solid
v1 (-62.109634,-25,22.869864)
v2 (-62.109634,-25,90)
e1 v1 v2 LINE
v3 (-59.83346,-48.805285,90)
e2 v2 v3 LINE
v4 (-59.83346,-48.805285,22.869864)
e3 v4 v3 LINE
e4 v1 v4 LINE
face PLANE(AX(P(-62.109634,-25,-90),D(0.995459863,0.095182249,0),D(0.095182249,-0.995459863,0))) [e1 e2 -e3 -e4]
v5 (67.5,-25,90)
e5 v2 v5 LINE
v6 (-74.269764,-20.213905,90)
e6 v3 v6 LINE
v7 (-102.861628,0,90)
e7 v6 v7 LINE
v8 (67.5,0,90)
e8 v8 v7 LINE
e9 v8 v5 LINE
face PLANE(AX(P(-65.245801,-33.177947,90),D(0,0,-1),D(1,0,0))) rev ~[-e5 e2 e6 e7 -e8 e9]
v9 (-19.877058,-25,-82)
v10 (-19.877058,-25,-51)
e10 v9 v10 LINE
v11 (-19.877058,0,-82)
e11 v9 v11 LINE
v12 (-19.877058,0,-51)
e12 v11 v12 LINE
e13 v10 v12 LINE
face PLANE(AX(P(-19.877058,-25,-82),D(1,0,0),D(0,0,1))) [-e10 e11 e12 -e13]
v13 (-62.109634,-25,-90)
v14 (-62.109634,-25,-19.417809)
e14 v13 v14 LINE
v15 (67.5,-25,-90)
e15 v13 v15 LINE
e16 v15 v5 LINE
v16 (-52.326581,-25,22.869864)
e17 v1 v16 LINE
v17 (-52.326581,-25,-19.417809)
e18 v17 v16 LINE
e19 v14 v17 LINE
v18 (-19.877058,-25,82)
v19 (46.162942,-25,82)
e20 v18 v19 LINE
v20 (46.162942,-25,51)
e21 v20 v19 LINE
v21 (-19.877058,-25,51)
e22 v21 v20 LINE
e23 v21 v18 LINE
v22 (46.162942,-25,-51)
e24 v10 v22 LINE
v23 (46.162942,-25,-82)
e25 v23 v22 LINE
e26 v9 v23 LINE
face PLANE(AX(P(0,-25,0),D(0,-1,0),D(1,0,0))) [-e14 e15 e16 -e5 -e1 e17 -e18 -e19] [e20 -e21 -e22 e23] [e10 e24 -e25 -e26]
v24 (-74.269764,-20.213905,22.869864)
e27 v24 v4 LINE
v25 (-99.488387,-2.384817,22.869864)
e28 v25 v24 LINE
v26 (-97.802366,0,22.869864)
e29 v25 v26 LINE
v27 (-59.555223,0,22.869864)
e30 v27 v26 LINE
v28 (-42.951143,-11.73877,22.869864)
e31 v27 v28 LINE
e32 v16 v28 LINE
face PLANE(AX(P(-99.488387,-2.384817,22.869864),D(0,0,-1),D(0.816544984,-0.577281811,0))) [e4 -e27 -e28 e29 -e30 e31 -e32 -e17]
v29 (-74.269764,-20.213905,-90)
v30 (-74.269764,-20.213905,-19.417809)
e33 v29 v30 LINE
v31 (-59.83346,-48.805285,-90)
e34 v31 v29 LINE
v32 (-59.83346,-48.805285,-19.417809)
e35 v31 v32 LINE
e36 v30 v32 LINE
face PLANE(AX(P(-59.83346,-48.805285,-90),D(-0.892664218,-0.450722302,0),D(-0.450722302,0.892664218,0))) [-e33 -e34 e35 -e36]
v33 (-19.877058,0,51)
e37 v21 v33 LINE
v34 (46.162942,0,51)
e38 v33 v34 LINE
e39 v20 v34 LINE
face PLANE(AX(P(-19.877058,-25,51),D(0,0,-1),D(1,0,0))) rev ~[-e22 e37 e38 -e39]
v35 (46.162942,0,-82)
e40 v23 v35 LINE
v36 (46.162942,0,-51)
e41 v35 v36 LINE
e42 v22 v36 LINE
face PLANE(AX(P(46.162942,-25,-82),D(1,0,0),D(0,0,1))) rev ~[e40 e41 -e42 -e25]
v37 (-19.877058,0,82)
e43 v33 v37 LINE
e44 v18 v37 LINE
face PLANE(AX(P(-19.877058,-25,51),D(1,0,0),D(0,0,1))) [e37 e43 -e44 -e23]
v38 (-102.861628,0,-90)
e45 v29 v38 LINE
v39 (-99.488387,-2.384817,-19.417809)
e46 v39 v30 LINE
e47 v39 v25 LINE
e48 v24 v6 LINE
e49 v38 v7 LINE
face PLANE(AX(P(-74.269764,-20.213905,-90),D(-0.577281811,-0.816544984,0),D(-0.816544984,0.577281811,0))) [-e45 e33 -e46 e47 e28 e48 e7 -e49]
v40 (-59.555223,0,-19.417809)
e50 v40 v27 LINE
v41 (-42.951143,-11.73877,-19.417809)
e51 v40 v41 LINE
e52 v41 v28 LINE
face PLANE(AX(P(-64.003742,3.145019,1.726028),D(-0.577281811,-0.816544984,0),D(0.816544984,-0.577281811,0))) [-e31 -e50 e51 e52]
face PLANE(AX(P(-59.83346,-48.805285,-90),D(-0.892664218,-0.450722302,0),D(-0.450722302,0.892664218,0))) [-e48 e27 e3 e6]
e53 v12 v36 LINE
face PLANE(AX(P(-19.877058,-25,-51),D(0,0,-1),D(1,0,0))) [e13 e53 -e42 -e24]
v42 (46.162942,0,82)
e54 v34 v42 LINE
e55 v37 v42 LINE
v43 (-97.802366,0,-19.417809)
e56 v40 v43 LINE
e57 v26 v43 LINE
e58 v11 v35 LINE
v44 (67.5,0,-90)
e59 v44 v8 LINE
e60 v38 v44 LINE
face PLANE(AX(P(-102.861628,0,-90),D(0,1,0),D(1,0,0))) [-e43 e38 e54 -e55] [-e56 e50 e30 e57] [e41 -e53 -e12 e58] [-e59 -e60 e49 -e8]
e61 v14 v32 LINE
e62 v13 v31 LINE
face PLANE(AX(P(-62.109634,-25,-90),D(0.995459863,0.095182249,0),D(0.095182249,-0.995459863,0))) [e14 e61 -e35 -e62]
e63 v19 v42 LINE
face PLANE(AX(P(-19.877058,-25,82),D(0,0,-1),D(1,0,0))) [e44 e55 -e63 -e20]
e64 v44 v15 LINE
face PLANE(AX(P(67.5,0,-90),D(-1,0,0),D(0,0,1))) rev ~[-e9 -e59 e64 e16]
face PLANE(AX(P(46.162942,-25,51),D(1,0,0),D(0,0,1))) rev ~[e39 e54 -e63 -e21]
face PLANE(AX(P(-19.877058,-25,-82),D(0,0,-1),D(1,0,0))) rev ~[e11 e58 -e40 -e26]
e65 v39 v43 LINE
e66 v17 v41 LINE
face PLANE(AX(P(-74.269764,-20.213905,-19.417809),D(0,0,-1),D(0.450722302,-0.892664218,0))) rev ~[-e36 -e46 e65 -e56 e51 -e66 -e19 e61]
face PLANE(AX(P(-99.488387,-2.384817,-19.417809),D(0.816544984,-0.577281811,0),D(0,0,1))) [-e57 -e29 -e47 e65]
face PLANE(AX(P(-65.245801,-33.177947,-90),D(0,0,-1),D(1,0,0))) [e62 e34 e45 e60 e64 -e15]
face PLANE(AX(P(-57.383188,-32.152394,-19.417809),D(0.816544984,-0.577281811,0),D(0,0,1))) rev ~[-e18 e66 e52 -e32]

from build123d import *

# Parameters (mm, degrees)
F0_W     = 135
F0_H     = 180
F1_DEPTH = 25
F3_DEPTH = 180
F4_W     = 51.5650697052
F4_H     = 42.2876738012
F5_DEPTH = 25
F6_W     = 66.04
F6_H     = 31
F7_DEPTH = 25
F8_W     = 32.0292665178
F8_H     = 42.2876738012
F9_DEPTH = 10


# Not quite as in the source:
# - a feature names something its author has since deleted; it is built from what else it names


with BuildPart() as f1:
    # F0 (on Front) → F1 (new body)
    with BuildSketch(Plane.XZ):
        Rectangle(F0_W, F0_H)
    extrude(amount=F1_DEPTH)

    # F2 (on face) → F3 (join)
    with BuildSketch(Plane(origin=(0, 0, -90), x_dir=(1, 0, 0), z_dir=(0, 0, -1))):
        Polygon((-74.269764297, 20.2139050914), (-67.5, 25), (-62.1096342802, 25), (-59.8334595561, 48.8052852452), align=None)
        Polygon((-67.5, 0), (-67.5, 25), (-74.269764297, 20.2139050914), (-102.8616279364, 0), align=None)
    extrude(amount=-F3_DEPTH)

    # F4 (on face) → F5 (cut)
    with BuildSketch(Plane(origin=(-34.2790786746, -48.4865610438, 0), x_dir=(0.8165449841, -0.5772818107, 0), z_dir=(-0.5772818107, -0.8165449841, 0))):
        with Locations((-54.0774967521, 1.7260275781)):
            Rectangle(F4_W, F4_H)
    extrude(amount=-F5_DEPTH, mode=Mode.SUBTRACT)

    # F6 (on face) → F7 (cut)
    with BuildSketch(Plane.XZ.offset(25)):
        with Locations((13.1429424509, 66.5)):
            Rectangle(F6_W, F6_H)
        with Locations((13.1429424509, -66.5)):
            Rectangle(F6_W, F6_H)
    extrude(amount=-F7_DEPTH, mode=Mode.SUBTRACT)

    # F8 (on face) → F9 (cut)
    with BuildSketch(Plane(origin=(-67.3147543785, -33.9884364638, 0), x_dir=(0.4507223021, -0.8926642181, 0), z_dir=(-0.8926642181, -0.4507223021, 0))):
        with Locations((0.5838238992, 1.7260275781)):
            Rectangle(F8_W, F8_H)
    extrude(amount=-F9_DEPTH, mode=Mode.SUBTRACT)


solid = f1.part
